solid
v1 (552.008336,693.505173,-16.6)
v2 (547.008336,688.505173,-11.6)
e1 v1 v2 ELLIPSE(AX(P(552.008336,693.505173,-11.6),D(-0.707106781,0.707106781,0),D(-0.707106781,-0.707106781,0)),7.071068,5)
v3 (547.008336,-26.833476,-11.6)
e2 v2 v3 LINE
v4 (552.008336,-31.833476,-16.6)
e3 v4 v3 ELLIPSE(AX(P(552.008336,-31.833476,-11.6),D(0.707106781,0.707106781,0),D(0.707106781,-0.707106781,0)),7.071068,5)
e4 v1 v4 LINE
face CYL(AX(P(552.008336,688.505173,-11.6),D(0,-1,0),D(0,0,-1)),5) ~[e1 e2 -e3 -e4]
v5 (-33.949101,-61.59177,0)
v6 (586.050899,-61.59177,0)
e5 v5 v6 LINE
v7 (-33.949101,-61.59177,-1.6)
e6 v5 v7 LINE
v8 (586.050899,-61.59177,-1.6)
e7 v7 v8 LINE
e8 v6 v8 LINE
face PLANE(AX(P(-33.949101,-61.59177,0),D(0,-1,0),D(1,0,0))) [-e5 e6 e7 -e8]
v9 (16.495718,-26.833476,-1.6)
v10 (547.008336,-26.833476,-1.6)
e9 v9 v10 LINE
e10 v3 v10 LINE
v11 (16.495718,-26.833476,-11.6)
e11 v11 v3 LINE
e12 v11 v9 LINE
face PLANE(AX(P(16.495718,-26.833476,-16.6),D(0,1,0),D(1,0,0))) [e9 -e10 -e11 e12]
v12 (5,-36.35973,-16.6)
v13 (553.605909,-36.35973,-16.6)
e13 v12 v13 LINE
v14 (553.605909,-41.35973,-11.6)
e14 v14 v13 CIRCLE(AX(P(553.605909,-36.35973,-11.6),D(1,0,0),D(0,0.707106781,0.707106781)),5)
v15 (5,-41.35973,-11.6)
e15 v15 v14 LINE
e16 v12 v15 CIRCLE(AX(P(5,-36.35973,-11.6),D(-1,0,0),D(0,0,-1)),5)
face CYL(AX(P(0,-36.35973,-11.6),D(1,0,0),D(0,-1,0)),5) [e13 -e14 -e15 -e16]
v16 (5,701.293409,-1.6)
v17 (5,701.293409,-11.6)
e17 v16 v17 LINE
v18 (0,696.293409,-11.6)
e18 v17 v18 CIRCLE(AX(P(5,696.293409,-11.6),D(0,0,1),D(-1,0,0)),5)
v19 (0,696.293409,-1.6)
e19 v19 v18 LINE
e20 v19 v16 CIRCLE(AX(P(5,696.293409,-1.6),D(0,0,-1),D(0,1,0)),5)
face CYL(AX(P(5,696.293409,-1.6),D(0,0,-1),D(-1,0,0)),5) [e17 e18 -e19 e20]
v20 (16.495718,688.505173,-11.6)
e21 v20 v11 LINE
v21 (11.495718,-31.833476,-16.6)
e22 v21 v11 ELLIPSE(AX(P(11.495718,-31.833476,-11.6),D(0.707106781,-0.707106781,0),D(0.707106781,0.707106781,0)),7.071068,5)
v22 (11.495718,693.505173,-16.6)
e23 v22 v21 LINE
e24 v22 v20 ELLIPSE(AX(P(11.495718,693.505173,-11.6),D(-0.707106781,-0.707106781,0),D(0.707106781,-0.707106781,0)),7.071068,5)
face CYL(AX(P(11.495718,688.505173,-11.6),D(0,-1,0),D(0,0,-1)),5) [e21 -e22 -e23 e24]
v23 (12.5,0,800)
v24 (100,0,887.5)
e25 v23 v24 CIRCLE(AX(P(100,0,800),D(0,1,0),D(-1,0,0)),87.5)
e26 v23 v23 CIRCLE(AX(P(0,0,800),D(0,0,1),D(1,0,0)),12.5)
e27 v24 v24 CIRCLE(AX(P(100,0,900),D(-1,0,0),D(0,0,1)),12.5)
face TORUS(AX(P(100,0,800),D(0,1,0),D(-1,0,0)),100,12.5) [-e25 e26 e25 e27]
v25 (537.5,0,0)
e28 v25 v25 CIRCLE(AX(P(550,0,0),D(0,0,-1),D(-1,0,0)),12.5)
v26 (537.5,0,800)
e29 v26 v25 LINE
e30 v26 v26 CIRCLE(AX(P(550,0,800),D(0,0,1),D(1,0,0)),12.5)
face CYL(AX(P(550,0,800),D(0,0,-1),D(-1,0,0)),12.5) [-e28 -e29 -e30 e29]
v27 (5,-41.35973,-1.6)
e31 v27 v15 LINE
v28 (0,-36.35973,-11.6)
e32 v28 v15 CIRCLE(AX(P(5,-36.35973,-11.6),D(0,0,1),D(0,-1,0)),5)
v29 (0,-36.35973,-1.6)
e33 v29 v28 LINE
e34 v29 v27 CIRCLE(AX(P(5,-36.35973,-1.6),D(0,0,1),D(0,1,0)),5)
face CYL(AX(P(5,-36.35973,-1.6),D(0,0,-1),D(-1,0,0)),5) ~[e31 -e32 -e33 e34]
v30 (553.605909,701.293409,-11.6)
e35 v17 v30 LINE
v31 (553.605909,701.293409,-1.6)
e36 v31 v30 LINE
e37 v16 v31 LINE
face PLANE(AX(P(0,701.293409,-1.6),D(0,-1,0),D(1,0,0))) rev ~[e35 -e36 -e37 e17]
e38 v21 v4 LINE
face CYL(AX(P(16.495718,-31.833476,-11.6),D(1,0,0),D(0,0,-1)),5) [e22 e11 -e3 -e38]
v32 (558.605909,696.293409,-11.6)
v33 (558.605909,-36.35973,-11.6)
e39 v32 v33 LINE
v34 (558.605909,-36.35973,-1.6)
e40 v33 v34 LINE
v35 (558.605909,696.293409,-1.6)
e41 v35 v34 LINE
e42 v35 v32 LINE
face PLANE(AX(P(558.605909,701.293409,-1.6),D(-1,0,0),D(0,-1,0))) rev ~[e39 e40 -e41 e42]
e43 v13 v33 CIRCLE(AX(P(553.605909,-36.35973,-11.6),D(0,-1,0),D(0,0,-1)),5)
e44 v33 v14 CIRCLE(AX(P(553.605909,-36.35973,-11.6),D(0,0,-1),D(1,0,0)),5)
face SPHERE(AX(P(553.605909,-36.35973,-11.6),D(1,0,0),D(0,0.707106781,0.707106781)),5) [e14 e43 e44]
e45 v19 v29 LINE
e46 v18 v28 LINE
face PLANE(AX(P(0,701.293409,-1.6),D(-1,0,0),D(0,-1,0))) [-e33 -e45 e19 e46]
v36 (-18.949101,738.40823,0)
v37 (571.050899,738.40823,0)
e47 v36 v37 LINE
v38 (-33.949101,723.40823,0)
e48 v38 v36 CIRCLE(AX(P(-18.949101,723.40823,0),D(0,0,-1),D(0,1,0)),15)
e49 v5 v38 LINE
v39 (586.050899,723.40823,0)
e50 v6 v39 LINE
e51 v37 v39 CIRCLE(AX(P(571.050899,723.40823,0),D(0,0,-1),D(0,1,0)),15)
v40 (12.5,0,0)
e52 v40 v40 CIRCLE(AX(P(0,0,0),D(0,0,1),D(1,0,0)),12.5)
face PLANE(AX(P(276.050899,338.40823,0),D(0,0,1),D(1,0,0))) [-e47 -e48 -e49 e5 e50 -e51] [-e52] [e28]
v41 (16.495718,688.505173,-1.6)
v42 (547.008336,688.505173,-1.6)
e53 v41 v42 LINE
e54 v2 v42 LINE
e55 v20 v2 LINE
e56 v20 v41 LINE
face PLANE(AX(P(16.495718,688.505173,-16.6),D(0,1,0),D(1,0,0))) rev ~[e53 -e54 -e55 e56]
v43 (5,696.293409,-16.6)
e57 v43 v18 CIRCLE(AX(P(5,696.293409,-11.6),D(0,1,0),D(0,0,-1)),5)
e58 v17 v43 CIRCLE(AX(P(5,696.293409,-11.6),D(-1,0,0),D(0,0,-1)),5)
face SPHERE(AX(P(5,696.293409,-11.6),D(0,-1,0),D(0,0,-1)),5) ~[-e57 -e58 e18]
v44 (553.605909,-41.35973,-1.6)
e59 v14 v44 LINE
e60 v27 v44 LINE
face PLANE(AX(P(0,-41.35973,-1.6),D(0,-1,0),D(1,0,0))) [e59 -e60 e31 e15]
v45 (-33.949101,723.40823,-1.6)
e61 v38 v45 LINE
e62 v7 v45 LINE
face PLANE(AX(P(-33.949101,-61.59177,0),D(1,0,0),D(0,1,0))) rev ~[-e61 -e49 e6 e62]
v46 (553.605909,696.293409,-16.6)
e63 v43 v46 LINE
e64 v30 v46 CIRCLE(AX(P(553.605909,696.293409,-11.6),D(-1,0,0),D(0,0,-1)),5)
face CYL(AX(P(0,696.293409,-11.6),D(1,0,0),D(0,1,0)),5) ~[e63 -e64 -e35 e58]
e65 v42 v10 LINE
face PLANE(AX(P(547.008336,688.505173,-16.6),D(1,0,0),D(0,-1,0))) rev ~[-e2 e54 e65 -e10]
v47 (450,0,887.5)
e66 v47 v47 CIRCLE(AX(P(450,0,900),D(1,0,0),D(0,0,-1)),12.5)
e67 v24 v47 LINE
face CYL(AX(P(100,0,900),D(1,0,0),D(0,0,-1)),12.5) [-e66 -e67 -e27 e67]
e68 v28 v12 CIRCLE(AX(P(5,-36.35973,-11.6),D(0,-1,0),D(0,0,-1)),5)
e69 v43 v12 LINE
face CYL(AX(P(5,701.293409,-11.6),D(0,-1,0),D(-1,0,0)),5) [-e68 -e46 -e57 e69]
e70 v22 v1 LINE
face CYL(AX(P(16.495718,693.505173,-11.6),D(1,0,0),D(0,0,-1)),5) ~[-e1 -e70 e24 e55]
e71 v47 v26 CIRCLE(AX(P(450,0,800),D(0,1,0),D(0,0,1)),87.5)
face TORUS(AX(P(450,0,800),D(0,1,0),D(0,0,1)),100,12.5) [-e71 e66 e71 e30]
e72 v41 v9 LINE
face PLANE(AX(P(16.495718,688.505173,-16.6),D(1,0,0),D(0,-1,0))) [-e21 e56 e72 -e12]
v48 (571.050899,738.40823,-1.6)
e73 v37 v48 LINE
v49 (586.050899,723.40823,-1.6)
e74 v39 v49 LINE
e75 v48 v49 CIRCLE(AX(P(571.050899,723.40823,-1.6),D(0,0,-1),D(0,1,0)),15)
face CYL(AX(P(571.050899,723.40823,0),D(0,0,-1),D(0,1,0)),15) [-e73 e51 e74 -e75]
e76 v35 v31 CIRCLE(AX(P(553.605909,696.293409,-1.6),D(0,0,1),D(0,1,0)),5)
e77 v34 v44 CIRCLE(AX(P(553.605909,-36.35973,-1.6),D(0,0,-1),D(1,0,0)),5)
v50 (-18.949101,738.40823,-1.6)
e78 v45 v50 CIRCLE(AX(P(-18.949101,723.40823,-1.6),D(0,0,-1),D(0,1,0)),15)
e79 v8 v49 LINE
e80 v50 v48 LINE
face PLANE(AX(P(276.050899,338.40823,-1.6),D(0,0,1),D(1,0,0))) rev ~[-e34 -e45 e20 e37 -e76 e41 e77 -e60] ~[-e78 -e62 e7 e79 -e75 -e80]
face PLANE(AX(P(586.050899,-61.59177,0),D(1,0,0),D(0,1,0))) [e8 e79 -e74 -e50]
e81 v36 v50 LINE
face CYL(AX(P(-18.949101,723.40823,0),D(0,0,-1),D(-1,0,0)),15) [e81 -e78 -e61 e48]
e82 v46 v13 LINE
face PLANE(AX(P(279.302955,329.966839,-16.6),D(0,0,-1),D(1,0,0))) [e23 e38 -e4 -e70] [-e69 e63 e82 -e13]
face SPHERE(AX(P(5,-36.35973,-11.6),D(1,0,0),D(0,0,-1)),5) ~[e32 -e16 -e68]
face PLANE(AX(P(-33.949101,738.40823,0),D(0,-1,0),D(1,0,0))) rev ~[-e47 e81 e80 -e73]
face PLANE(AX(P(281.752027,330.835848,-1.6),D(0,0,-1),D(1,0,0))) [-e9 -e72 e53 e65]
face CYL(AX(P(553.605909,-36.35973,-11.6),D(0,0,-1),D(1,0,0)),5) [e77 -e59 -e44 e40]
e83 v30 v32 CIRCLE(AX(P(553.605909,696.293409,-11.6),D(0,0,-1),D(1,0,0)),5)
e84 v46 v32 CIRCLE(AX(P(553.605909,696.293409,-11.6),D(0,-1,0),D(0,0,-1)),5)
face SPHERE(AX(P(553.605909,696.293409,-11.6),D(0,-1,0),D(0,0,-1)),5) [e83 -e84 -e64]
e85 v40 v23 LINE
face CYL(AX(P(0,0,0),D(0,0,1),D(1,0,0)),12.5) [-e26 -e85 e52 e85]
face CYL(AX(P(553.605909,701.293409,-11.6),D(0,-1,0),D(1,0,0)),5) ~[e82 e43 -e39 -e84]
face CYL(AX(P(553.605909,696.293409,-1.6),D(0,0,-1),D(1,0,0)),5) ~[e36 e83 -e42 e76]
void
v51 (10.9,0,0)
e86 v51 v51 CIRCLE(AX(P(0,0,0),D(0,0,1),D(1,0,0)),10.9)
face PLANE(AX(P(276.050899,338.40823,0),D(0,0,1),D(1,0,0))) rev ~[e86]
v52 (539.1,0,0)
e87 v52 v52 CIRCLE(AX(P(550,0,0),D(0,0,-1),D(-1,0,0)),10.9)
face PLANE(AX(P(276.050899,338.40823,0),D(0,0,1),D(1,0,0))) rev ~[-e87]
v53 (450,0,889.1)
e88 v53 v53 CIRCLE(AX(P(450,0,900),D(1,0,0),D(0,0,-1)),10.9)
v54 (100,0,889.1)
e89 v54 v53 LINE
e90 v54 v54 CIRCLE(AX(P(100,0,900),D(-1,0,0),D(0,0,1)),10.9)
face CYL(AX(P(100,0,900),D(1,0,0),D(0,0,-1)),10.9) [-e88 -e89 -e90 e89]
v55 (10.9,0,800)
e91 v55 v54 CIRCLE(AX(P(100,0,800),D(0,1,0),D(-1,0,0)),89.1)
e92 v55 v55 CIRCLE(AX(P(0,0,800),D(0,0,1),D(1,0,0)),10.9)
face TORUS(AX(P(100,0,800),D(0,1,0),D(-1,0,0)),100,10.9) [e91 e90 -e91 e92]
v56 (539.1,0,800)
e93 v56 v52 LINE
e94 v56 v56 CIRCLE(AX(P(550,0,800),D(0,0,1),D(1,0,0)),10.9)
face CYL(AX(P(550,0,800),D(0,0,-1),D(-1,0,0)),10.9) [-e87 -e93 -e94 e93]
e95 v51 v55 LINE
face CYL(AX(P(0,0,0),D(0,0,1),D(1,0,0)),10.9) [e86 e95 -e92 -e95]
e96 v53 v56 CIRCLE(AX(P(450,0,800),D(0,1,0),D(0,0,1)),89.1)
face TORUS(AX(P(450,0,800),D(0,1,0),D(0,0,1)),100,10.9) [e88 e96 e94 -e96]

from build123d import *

# Parameters (mm, degrees)
F0_R         = 12.5
F0_R_2       = 10.9
F3_W         = 620
F3_H         = 800
F4_DEPTH     = 1.6
F5_R         = 15
F6_R         = 15
F7_W         = 558.6059093475
F7_H         = 742.6531389356
F8_DEPTH     = 15
F9_W         = 530.512617901
F9_H         = 715.3386492282
F10_DEPTH    = 15
F11_R        = 5
F12_T1_DEPTH = 10
F12_S5_W     = 5.1
F12_S5_H     = 5.1
F12_T6_DEPTH = 5.1


# Not quite as in the source:
# - a fillet or chamfer that OpenCascade refuses, or shapes differently, is made with other operations: its cross-section is extruded or revolved along the edge and cut away or added


with BuildPart() as f2:
    # F2: sweep along a path in F1
    with BuildLine(Plane.XZ) as f2_path:
        Line((0, 0), (0, 800))
        ThreePointArc((0, 800), (29.2893218813, 870.7106781187), (100, 900))
        Line((100, 900), (450, 900))
        ThreePointArc((450, 900), (520.7106781187, 870.7106781187), (550, 800))
        Line((550, 800), (550, 0))
    # F0 (on Top) → F2 (sweep)
    with BuildSketch(Plane.XY):
        Circle(F0_R)
        Circle(F0_R_2, mode=Mode.SUBTRACT)
    sweep(path=f2_path.line)

    # F3 (on Top) → F4 (join)
    with BuildSketch(Plane.XY):
        with Locations((276.0508990288, 338.4082295001)):
            Rectangle(F3_W, F3_H)
    extrude(amount=-F4_DEPTH)

    # F5
    f5_edges = [f2.edges().sort_by_distance(p)[0] for p in [
        (-33.949101, 738.40823, -0.8),
    ]]
    fillet(f5_edges, radius=F5_R)

    # F6
    f6_edges = [f2.edges().sort_by_distance(p)[0] for p in [
        (586.050899, 738.40823, -0.8),
    ]]
    fillet(f6_edges, radius=F6_R)

    # F7 (on face) → F8 (join)
    with BuildSketch(Plane(origin=(0, 0, -1.6), x_dir=(1, 0, 0), z_dir=(0, 0, -1))):
        with Locations((279.3029546738, -329.9668394029)):
            Rectangle(F7_W, F7_H)
    extrude(amount=F8_DEPTH)

    # F9 (on face) → F10 (cut)
    with BuildSketch(Plane(origin=(0, 0, -16.6), x_dir=(1, 0, 0), z_dir=(0, 0, -1))):
        with Locations((281.7520266399, -330.8358481154)):
            Rectangle(F9_W, F9_H)
    extrude(amount=-F10_DEPTH, mode=Mode.SUBTRACT)

    # F11
    f11_edges = [f2.edges().sort_by_distance(p)[0] for p in [
        (558.605909, 329.966839, -16.6),
        (547.008336, 330.835848, -16.6),
        (279.302955, -41.35973, -16.6),
        (281.752027, -26.833476, -16.6),
        (16.495718, 330.835848, -16.6),
        (0, 329.966839, -16.6),
        (281.752027, 688.505173, -16.6),
        (279.302955, 701.293409, -16.6),
        (558.605909, 701.293409, -9.1),
        (0, 701.293409, -9.1),
        (0, -41.35973, -9.1),
    ]]
    fillet(f11_edges, radius=F11_R)

    # F12: fillet of radius 5 on 2 edges, made by hand

    # F12_s2 → F12_t1 (cut)
    with BuildSketch(Plane.XY.offset(-11.6)):
        with BuildLine():
            ThreePointArc((558.6059093475, -36.3597300649), (557.1414432535, -39.8952639708), (553.6059093475, -41.3597300649))
            Line((553.6059093475, -41.3597300649), (558.6059093475, -41.3597300649))
            Line((558.6059093475, -41.3597300649), (558.6059093475, -36.3597300649))
        make_face()
    extrude(amount=F12_T1_DEPTH, mode=Mode.SUBTRACT)


with BuildPart() as f12_tool4:
    # F12_s5 → F12_t6 (new body)
    with BuildSketch(Plane.YZ.offset(553.6059093475)):
        with Locations((-38.9097300649, -14.15)):
            Rectangle(F12_S5_W, F12_S5_H)
    extrude(amount=F12_T6_DEPTH)

    # F12_s7 → F12_t8 (revolve, cut)
    with BuildSketch(Plane(origin=(553.6059093475, -36.3597300649, -11.6), x_dir=(0, 0.7071067812, 0.7071067812), z_dir=(0, 0.7071067812, -0.7071067812))):
        with BuildLine():
            ThreePointArc((0, -5), (5, 0), (0, 5))
            Line((0, 5), (0, -5))
        make_face()
    revolve(axis=Axis((553.6059093475, -36.3597300649, -11.6), (1, 0, 0)), mode=Mode.SUBTRACT)


with BuildPart() as f2_1:
    add(f2.part)

    # F12_t3: cut F12_tool4
    add(f12_tool4.part, mode=Mode.SUBTRACT)


solid = f2_1.part
